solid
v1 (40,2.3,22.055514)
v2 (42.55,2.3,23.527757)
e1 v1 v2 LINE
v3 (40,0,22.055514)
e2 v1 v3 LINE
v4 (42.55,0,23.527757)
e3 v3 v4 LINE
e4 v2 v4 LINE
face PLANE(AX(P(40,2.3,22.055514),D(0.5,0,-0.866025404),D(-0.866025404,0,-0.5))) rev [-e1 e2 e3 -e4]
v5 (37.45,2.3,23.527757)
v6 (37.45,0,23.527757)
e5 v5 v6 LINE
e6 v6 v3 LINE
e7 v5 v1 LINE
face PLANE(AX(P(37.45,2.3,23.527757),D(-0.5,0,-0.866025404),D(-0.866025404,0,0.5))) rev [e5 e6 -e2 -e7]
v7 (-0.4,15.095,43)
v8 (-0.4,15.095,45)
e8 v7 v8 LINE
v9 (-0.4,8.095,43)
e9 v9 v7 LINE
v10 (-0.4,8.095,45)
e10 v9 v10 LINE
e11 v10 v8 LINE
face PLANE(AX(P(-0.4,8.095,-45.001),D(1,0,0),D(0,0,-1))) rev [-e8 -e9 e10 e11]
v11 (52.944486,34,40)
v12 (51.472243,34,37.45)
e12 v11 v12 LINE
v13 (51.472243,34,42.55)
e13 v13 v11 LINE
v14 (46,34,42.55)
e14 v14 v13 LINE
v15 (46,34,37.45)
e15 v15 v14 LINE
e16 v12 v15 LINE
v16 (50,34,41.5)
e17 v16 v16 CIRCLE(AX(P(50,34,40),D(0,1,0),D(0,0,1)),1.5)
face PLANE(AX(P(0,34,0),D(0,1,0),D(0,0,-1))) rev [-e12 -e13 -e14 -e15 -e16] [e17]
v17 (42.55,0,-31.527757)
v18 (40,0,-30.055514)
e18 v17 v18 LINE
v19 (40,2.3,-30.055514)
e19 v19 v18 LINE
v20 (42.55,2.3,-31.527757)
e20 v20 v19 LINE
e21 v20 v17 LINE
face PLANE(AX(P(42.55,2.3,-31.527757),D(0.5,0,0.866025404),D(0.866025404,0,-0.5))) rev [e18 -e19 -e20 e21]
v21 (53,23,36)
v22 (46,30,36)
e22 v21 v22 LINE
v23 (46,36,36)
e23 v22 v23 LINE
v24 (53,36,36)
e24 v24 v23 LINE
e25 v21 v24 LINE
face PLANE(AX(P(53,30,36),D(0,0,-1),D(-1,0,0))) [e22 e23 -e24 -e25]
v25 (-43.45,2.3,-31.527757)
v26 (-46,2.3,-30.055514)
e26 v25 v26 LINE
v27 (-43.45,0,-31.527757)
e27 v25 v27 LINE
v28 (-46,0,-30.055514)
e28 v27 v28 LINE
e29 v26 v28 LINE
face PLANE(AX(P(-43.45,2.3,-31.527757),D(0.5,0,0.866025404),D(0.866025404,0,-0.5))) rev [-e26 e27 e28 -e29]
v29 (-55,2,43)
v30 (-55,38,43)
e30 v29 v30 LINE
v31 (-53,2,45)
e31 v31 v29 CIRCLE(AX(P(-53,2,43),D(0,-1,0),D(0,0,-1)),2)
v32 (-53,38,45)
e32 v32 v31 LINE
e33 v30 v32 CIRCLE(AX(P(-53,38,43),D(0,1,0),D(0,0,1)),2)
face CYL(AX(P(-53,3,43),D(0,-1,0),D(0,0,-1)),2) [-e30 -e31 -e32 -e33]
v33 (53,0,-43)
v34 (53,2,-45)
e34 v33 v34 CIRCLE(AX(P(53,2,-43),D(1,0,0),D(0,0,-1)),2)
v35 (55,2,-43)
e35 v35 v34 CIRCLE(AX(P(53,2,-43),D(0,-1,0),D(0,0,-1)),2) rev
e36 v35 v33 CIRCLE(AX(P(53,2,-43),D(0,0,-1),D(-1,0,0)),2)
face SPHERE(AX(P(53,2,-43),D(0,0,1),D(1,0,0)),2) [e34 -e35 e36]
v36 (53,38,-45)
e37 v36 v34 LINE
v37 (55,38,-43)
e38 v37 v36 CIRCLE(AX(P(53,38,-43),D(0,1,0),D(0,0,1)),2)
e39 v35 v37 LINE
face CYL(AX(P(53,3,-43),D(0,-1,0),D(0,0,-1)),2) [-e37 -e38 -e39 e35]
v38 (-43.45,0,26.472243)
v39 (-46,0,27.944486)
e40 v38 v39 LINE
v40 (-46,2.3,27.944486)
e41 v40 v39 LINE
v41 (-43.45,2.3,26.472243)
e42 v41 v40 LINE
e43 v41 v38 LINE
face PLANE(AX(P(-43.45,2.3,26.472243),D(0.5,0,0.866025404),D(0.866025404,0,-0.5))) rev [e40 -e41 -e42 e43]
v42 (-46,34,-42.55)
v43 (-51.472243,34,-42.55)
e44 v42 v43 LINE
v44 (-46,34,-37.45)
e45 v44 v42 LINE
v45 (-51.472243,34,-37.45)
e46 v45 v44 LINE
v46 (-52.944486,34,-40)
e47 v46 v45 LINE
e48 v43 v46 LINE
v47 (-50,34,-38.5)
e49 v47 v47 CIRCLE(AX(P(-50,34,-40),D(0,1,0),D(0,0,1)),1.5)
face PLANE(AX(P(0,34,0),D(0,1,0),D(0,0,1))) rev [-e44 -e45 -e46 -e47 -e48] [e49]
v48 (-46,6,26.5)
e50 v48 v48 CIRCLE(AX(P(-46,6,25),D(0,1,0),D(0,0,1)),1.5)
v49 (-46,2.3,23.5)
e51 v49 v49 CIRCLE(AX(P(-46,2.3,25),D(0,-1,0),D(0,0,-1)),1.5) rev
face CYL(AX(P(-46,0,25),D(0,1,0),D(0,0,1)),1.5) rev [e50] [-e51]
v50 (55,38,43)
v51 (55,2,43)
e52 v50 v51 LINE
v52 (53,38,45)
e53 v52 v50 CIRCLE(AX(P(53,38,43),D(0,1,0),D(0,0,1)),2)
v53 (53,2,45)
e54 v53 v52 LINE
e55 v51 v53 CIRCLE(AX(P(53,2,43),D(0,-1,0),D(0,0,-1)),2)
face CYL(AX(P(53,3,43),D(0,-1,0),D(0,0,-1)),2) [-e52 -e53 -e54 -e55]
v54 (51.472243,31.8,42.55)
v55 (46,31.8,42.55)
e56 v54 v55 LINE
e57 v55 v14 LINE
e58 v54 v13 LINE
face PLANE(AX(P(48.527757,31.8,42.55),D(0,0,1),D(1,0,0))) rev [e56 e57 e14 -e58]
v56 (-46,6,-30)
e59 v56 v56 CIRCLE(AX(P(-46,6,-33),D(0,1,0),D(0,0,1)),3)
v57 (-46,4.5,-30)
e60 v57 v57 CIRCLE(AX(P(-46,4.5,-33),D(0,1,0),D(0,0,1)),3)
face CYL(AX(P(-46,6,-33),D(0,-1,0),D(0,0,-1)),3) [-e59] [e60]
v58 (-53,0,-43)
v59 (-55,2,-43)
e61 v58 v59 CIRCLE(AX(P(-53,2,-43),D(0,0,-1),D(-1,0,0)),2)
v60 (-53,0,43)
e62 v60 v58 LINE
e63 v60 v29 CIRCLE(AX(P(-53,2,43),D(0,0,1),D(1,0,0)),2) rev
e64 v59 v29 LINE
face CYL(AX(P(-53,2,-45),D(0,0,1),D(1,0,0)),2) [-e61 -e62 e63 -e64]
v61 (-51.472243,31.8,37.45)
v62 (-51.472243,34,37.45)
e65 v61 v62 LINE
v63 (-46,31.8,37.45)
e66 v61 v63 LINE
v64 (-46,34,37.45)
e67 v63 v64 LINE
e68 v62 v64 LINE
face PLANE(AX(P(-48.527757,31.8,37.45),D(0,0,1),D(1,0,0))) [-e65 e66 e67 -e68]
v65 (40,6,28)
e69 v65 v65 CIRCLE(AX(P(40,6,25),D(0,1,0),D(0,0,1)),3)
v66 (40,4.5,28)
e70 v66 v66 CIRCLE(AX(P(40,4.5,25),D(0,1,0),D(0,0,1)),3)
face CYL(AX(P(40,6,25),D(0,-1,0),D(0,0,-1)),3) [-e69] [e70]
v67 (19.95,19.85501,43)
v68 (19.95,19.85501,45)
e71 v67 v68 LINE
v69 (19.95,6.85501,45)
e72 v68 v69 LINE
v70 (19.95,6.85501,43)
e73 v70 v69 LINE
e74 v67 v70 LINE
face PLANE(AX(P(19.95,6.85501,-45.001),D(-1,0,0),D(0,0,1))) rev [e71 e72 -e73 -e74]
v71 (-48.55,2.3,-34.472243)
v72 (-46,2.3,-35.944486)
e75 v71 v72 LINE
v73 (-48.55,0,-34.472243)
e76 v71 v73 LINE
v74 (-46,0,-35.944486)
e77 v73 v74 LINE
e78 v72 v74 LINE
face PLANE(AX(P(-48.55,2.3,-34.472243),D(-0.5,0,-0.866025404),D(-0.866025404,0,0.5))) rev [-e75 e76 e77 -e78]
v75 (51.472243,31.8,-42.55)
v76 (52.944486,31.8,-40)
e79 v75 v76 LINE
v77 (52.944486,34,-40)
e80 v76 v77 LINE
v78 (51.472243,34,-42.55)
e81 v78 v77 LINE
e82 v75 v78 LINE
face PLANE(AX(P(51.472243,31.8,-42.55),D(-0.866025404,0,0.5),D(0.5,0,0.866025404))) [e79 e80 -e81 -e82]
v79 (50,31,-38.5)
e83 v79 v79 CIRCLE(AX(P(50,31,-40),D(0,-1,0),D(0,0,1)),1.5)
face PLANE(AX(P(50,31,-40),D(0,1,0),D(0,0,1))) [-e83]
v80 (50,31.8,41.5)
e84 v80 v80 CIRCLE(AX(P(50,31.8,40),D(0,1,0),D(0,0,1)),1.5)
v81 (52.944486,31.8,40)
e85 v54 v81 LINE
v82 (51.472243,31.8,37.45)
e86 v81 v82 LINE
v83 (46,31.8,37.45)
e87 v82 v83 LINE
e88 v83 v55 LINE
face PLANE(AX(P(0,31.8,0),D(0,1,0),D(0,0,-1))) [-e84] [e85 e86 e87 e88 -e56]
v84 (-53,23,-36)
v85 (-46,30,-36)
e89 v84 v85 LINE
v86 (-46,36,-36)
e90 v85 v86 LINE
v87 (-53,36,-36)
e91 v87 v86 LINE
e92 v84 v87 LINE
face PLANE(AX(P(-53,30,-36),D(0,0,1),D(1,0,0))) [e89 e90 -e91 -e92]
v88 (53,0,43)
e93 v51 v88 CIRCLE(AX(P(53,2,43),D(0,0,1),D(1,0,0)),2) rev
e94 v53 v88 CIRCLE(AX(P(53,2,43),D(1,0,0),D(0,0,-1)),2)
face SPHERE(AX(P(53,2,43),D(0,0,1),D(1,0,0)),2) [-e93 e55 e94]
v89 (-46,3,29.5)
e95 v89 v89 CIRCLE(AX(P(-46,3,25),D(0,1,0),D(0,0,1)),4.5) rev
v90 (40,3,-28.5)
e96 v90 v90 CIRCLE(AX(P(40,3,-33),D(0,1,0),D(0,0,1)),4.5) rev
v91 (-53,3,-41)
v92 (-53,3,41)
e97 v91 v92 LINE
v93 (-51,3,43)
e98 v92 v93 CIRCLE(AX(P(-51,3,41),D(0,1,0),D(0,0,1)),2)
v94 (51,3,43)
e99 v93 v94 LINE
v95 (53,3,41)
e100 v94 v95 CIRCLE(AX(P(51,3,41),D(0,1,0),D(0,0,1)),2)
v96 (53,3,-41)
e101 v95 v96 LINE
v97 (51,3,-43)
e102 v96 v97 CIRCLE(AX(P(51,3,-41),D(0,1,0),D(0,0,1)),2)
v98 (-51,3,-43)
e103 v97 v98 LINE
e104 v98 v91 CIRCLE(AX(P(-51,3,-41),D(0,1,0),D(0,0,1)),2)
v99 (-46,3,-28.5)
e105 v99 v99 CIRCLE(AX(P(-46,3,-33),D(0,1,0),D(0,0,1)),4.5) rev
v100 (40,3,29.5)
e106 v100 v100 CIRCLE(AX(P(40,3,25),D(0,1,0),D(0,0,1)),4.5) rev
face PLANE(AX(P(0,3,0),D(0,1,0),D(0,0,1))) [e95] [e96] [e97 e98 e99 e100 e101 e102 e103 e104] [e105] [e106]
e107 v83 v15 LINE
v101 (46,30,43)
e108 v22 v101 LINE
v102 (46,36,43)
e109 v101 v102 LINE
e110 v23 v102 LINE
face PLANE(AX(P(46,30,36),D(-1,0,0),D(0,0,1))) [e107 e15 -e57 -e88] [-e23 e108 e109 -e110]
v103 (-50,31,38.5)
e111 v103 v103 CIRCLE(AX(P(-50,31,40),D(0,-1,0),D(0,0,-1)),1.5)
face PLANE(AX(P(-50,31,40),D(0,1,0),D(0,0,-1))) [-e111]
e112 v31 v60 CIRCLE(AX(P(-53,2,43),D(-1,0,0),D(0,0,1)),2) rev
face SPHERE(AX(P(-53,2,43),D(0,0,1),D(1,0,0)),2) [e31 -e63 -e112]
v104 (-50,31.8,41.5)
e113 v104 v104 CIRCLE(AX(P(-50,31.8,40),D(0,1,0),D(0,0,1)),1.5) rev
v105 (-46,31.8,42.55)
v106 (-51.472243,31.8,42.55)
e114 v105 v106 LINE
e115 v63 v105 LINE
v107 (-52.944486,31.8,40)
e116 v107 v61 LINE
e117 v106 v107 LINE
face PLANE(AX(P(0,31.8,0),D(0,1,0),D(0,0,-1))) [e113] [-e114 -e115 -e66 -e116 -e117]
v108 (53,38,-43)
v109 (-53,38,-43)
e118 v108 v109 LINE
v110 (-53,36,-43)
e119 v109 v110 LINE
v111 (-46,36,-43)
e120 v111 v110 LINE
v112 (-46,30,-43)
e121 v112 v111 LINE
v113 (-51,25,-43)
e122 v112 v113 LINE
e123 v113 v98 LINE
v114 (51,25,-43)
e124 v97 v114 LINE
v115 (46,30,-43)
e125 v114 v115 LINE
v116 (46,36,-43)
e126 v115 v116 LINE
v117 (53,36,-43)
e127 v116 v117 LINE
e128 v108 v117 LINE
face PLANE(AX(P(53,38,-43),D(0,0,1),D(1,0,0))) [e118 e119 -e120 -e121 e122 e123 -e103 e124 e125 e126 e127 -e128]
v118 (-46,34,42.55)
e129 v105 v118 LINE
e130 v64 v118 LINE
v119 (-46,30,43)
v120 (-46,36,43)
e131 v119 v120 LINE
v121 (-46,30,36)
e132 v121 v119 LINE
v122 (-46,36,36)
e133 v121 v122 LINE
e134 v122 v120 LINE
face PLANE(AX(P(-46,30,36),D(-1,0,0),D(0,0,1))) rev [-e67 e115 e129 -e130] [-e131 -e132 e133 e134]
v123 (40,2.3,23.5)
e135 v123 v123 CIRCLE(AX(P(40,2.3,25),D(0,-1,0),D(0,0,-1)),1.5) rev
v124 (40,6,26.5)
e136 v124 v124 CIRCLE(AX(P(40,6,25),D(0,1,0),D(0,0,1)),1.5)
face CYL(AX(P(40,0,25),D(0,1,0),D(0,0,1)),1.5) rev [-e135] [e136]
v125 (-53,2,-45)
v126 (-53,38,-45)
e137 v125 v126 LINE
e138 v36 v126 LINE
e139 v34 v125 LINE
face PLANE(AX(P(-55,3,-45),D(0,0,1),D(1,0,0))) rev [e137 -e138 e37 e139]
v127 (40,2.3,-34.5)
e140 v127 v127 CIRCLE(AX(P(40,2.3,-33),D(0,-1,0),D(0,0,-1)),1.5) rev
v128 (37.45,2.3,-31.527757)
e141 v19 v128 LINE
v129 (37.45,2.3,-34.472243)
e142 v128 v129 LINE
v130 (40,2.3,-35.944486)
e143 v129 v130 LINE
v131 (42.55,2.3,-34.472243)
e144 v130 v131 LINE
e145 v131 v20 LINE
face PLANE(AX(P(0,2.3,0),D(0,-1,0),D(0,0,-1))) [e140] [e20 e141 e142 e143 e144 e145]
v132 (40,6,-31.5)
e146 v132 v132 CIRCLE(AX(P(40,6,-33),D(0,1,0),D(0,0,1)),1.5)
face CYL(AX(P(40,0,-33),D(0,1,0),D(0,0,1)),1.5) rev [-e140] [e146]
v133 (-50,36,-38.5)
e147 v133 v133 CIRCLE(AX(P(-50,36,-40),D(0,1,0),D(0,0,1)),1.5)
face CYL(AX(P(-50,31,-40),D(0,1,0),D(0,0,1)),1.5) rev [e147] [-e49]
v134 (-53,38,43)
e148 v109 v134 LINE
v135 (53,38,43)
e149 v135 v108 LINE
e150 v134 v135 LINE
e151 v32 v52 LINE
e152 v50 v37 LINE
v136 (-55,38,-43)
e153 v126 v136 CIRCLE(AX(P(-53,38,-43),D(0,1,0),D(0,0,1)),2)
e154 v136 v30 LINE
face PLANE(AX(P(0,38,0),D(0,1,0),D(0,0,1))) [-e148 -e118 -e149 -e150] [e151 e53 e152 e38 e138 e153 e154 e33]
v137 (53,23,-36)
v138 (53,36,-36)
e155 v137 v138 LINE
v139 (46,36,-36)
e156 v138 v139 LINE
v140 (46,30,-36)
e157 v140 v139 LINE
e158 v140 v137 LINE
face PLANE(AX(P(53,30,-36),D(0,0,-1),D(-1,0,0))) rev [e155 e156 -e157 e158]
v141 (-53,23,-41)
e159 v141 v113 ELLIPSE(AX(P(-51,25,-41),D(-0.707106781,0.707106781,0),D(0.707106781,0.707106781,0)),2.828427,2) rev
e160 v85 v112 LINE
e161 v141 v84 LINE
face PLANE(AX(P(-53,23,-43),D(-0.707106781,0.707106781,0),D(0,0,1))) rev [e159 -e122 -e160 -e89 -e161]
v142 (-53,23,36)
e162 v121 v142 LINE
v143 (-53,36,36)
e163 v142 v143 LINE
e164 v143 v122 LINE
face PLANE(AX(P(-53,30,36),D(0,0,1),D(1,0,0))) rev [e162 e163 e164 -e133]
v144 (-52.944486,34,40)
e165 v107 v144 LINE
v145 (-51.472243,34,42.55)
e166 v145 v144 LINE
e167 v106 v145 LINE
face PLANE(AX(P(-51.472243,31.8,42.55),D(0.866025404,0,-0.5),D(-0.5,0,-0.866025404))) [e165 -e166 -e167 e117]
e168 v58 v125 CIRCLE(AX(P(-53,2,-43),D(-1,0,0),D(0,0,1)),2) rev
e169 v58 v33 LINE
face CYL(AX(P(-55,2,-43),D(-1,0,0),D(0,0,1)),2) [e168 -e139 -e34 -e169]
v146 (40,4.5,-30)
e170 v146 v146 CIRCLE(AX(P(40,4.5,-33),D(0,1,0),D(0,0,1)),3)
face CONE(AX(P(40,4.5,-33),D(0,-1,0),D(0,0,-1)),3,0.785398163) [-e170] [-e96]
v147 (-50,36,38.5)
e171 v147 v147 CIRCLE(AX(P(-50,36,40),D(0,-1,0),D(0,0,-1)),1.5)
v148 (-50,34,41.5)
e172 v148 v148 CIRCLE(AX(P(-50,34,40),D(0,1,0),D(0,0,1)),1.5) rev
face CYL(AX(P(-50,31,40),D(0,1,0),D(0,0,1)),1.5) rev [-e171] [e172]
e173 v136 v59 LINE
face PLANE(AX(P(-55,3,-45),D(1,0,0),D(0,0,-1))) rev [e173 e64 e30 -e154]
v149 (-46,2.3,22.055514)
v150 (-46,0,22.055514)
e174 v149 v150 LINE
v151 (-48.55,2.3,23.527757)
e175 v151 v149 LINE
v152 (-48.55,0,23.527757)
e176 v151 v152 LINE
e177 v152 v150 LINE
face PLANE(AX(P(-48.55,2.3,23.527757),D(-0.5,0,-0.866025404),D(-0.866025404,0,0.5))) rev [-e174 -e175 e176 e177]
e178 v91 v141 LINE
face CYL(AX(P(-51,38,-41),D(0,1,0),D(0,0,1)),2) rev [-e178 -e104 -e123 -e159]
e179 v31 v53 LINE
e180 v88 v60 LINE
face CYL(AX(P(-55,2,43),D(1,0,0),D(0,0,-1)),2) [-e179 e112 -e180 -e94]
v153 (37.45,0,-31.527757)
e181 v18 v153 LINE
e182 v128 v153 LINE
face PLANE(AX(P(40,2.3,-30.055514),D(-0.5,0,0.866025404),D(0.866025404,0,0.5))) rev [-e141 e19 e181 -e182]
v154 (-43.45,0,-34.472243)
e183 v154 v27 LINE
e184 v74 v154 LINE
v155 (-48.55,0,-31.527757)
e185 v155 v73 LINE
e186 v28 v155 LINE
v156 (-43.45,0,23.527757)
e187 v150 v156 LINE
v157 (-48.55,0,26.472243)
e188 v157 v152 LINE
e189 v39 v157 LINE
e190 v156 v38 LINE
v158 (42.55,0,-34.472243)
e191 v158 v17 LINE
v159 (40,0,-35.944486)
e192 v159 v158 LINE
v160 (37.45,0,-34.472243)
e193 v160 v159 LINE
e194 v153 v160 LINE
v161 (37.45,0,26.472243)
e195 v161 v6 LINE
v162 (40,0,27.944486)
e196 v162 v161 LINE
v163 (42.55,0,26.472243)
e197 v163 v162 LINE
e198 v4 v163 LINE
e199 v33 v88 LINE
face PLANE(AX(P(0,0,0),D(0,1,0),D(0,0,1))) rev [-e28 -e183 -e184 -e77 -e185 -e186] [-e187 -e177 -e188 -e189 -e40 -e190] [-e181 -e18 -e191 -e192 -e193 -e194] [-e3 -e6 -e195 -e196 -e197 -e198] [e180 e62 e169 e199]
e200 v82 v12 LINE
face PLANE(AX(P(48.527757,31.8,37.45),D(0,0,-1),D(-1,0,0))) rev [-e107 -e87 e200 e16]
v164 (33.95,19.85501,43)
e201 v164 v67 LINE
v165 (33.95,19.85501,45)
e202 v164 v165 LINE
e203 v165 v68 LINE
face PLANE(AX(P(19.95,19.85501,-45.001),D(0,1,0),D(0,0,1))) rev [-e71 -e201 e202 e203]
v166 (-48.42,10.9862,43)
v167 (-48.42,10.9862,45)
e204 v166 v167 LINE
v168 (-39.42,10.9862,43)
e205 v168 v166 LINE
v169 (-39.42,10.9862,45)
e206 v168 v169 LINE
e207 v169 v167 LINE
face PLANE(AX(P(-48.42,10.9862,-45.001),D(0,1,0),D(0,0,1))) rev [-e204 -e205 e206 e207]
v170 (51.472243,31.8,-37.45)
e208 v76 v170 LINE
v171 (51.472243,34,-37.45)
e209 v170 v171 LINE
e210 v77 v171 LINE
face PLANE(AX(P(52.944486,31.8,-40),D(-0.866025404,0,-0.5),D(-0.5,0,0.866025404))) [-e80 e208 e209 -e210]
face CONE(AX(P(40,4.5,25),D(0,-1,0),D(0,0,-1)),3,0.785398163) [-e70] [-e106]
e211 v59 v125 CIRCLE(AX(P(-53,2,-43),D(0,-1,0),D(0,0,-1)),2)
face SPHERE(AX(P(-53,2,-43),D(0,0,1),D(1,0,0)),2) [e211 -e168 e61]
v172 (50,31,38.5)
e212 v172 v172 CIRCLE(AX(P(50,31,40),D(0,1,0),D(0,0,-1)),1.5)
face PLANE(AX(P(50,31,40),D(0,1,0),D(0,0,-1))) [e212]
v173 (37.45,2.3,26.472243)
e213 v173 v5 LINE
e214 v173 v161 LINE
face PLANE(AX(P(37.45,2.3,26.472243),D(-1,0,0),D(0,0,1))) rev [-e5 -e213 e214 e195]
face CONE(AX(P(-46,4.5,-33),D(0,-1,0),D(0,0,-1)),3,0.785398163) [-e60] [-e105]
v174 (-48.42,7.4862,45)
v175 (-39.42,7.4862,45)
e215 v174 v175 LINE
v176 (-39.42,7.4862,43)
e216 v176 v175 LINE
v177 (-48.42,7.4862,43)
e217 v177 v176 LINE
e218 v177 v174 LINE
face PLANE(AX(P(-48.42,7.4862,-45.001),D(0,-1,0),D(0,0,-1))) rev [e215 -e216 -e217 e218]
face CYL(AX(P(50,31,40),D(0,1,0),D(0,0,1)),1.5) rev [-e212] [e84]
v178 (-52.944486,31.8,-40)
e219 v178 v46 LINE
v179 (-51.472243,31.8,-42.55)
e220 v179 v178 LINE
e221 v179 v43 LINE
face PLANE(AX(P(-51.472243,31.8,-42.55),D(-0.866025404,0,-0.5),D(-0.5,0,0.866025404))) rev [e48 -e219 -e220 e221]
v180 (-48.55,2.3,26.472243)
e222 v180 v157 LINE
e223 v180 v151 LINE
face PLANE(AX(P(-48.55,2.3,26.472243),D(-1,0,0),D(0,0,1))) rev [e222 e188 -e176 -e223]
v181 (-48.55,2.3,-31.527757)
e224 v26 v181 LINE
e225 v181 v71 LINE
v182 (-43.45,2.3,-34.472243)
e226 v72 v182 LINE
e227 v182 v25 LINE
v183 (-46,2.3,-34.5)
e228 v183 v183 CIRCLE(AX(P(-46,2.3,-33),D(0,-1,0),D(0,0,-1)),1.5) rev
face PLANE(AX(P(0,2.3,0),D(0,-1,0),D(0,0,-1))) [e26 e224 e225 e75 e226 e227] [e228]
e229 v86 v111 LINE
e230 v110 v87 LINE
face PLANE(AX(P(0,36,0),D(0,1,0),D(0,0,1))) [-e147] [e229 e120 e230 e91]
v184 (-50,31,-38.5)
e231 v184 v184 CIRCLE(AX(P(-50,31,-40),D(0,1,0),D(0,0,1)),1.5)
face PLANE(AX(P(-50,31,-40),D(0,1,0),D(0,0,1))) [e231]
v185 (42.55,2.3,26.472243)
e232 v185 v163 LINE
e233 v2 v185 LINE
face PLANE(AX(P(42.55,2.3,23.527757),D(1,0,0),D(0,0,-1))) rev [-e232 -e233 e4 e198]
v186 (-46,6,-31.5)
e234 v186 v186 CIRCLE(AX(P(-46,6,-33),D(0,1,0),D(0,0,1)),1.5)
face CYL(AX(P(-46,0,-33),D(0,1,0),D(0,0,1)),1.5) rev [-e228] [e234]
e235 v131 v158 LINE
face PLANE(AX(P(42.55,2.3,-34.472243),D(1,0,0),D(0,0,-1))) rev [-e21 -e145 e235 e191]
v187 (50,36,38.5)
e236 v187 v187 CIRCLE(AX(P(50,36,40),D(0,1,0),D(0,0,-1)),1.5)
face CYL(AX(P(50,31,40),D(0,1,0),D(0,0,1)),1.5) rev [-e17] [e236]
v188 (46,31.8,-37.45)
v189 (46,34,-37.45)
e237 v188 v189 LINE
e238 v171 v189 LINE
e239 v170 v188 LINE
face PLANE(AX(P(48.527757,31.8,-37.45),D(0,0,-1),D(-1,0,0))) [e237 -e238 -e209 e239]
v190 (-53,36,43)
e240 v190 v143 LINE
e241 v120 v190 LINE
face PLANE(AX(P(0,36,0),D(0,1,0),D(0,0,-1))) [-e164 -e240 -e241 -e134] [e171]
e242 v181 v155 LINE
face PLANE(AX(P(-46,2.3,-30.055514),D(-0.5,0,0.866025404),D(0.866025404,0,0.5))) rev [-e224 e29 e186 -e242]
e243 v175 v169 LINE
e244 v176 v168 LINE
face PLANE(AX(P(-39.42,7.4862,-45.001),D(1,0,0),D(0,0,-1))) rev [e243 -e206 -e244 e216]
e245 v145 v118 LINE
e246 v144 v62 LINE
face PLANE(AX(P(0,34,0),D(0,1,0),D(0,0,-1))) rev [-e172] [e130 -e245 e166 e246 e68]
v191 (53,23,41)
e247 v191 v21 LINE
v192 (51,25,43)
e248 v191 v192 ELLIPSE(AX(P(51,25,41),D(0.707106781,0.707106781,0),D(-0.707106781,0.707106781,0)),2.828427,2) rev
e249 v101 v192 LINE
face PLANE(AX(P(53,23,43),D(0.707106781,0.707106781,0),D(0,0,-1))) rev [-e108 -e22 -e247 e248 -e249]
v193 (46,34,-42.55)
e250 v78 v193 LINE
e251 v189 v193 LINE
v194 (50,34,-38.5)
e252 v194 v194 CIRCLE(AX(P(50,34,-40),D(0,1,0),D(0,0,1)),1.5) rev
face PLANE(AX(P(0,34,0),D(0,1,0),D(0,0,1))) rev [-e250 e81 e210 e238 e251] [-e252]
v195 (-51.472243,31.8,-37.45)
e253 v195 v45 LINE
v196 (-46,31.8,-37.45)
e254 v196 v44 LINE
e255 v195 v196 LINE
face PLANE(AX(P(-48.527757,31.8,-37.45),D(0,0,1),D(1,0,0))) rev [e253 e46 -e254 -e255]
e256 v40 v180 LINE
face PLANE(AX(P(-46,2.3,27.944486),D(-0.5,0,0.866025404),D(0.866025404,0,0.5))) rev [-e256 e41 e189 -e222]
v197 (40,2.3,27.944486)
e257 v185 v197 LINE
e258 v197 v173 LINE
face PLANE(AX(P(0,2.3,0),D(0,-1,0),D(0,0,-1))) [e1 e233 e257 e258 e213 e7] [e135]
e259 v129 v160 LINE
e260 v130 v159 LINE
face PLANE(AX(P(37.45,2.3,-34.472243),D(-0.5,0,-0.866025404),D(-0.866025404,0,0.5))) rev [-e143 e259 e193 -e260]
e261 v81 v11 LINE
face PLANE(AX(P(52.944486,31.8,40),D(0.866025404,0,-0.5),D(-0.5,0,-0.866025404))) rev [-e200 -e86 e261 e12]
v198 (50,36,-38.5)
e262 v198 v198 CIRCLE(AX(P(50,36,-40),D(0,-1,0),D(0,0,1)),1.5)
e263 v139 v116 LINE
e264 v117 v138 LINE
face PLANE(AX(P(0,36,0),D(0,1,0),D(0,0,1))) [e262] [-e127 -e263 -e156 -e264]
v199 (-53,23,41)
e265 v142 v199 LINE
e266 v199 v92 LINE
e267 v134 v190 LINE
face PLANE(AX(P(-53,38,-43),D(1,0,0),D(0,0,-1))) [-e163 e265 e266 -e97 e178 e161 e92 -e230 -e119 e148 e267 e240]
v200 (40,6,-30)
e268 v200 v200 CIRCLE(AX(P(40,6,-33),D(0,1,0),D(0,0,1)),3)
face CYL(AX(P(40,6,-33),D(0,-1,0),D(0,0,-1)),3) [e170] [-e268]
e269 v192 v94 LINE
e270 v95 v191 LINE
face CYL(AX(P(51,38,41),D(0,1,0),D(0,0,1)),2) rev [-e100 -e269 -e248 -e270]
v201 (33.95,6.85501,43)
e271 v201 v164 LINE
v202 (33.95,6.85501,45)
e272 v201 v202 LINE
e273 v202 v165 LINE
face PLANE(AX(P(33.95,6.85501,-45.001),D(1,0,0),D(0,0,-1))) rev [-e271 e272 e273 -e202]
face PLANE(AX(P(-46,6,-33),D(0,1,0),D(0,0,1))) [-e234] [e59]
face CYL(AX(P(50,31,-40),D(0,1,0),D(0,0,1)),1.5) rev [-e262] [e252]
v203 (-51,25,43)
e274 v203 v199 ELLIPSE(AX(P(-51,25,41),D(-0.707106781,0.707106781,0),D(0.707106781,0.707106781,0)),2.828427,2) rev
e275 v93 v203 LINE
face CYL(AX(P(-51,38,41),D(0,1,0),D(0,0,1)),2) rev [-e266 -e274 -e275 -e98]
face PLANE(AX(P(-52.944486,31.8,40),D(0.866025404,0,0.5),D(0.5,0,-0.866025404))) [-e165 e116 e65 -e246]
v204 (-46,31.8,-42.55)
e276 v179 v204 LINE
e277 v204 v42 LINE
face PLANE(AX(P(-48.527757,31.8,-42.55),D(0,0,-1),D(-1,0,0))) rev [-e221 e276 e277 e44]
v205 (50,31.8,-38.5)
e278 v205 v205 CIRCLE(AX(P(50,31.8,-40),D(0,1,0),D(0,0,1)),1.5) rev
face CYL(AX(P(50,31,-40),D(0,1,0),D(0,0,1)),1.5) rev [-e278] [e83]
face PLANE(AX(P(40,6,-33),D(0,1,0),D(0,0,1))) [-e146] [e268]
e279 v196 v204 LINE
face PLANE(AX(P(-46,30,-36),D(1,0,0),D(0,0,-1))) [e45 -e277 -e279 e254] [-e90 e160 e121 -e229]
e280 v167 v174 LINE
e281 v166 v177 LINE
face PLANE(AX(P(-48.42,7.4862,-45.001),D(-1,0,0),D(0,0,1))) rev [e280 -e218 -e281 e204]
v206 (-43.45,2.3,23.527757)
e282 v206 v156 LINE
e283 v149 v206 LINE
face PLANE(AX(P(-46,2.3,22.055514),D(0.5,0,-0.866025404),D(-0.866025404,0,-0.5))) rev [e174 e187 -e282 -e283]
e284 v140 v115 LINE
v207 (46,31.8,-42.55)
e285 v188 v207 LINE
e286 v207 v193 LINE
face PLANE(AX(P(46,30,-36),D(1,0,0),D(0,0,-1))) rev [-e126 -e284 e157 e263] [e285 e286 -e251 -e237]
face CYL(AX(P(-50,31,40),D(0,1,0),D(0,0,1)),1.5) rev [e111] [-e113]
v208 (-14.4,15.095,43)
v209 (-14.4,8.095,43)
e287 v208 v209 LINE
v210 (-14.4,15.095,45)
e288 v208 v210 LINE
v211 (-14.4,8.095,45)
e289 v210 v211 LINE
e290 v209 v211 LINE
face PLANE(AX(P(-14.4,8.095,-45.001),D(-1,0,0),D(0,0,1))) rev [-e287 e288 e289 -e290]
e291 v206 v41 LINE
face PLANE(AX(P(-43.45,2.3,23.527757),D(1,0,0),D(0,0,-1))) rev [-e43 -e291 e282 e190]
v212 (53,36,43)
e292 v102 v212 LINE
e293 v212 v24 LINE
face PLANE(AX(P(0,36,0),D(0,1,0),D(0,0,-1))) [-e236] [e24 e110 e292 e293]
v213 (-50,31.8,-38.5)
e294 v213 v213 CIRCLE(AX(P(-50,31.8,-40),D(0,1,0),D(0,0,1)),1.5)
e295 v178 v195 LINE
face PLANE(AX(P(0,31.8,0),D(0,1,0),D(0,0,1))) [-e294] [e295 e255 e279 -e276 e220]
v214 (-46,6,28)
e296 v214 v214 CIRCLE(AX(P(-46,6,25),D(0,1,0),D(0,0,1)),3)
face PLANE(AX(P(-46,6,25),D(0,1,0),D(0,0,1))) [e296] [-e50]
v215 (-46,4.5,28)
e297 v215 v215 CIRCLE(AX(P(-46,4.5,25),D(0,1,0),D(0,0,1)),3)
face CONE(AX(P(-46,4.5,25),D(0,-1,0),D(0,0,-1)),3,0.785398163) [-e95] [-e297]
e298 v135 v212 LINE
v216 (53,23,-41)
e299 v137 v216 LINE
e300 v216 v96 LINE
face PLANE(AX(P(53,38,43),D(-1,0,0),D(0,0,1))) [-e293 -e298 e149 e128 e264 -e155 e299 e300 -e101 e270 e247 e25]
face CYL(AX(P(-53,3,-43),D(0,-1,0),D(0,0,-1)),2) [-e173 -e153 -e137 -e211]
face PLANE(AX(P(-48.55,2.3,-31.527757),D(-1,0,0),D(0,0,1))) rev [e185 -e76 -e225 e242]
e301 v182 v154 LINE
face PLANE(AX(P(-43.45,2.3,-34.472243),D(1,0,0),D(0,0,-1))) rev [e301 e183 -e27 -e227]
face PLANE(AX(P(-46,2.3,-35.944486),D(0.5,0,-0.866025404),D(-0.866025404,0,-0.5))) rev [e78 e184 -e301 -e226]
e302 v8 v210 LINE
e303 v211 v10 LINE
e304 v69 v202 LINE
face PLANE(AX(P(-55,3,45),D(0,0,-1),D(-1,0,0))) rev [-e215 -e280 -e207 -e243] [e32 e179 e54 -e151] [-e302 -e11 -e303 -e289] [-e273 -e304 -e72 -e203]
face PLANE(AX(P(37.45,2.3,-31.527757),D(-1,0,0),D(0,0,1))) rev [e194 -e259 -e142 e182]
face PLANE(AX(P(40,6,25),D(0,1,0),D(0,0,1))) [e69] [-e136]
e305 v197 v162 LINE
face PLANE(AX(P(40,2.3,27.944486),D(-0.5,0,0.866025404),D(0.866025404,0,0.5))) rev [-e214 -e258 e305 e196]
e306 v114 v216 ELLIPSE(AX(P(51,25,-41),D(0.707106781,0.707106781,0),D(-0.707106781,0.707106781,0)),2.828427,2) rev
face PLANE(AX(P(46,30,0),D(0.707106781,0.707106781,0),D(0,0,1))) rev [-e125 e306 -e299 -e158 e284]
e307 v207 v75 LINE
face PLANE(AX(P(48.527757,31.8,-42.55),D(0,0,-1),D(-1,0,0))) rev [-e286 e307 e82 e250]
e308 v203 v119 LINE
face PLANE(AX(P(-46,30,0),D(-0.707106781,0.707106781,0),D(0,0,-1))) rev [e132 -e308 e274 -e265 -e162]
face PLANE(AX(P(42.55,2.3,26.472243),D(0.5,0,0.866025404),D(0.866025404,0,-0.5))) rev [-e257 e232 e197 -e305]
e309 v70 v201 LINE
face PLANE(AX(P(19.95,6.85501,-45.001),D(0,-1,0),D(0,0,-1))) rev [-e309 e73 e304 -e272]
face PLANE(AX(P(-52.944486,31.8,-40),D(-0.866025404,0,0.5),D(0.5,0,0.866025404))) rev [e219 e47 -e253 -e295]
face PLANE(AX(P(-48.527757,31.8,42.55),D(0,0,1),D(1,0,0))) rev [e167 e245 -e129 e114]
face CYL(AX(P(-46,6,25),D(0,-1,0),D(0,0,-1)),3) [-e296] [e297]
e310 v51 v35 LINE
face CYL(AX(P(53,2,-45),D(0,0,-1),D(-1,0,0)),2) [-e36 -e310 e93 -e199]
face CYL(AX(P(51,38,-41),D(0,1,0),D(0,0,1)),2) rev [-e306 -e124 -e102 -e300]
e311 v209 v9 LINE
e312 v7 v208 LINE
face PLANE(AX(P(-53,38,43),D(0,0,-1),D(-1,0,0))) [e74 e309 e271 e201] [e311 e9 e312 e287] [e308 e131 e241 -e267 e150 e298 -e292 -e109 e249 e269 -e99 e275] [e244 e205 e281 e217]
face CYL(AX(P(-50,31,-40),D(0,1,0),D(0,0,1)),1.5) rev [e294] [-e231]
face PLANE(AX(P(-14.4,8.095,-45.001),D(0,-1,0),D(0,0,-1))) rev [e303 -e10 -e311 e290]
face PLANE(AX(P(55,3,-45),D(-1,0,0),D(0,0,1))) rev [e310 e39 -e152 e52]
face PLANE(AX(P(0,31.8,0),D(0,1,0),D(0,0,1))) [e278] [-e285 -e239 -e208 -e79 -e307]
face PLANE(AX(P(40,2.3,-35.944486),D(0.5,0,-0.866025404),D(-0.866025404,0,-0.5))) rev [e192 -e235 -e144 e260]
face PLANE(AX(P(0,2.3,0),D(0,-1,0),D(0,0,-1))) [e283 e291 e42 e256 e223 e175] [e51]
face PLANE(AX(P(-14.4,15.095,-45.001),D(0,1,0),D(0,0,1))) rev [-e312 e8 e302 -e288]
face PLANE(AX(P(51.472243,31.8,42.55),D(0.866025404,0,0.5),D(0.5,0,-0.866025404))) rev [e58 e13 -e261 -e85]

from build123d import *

# Parameters (mm, degrees)
SKETCH1_W               = 110
SKETCH1_H               = 90
BOSS_EXTRUDE1_DEPTH     = 3
SKETCH2_W               = 110
SKETCH2_H               = 90
SKETCH2_W_2             = 106
SKETCH2_H_2             = 86
BOSS_EXTRUDE2_DEPTH     = 35
SKETCH3_R               = 3
BOSS_EXTRUDE3_DEPTH     = 3
SKETCH4_R               = 1.5
CUT_EXTRUDE1_DEPTH      = 78.935871074
CUT_EXTRUDE2_DEPTH      = 2.3
CUT_EXTRUDE3_REACH      = 114.112
SKETCH6_W               = 9
SKETCH6_H               = 3.5
SKETCH6_W_2             = 14
SKETCH6_H_2             = 13
SKETCH6_H_3             = 7
FILLET2_R               = 2
SKETCH7_W               = 7
SKETCH7_H               = 7
BOSS_EXTRUDE4_DEPTH     = 6
CUT_EXTRUDE4_DEPTH      = 2.2
SKETCH10_R              = 1.5
CUT_EXTRUDE5_DEPTH      = 5
CHAMFER2_SIZE           = 7
MIRROR4_COPY_1_SKETCH_W = 7
MIRROR4_COPY_1_SKETCH_H = 7
MIRROR4_COPY_1_DEPTH    = 6
MIRROR4_COPY_2_DEPTH    = 2.2
MIRROR4_COPY_3_SKETCH_R = 1.5
MIRROR4_COPY_3_DEPTH    = 5
CHAMFER3_SIZE           = 7
CHAMFER4_SIZE           = 7
FILLET6_R               = 2
CHAMFER5_SIZE           = 1.5


with BuildPart() as part:
    # Sketch1 → Boss-Extrude1 (new body)
    with BuildSketch(Plane(origin=(0, 0, 0), x_dir=(1, 0, 0), z_dir=(0, 1, 0))):
        Rectangle(SKETCH1_W, SKETCH1_H)
    extrude(amount=BOSS_EXTRUDE1_DEPTH)

    # Sketch2 → Boss-Extrude2 (add)
    with BuildSketch(Plane(origin=(0, 3, 0), x_dir=(1, 0, 0), z_dir=(0, 1, 0))):
        Rectangle(SKETCH2_W, SKETCH2_H)
        Rectangle(SKETCH2_W_2, SKETCH2_H_2, mode=Mode.SUBTRACT)
    extrude(amount=BOSS_EXTRUDE2_DEPTH)

    # Sketch3 → Boss-Extrude3 (add)
    with BuildSketch(Plane(origin=(0, 3, 0), x_dir=(1, 0, 0), z_dir=(0, 1, 0))):
        with Locations(Location((-46, 33, 0), (0, 0, 270))):
            Circle(SKETCH3_R)
        with Locations(Location((40, 33, 0), (0, 0, 270))):
            Circle(SKETCH3_R)
        with Locations(Location((-46, -25, 0), (0, 0, 270))):
            Circle(SKETCH3_R)
        with Locations(Location((40, -25, 0), (0, 0, 270))):
            Circle(SKETCH3_R)
    extrude(amount=BOSS_EXTRUDE3_DEPTH)

    # Sketch4 → Cut-Extrude1 (cut, through all)
    with BuildSketch(Plane(origin=(0, 6, 0), x_dir=(1, 0, 0), z_dir=(0, 1, 0))):
        with Locations(Location((-46, 33, 0), (0, 0, 270))):
            Circle(SKETCH4_R)
        with Locations(Location((40, 33, 0), (0, 0, 270))):
            Circle(SKETCH4_R)
        with Locations(Location((40, -25, 0), (0, 0, 270))):
            Circle(SKETCH4_R)
        with Locations(Location((-46, -25, 0), (0, 0, 270))):
            Circle(SKETCH4_R)
    extrude(amount=-CUT_EXTRUDE1_DEPTH, mode=Mode.SUBTRACT)

    # Sketch5 → Cut-Extrude2 (cut)
    with BuildSketch(Plane.XZ):
        Polygon((37.45, 26.472243186), (37.45, 23.527756814), (40, 22.055513627), (42.55, 23.527756814), (42.55, 26.472243186), (40, 27.944486373), align=None)
        Polygon((-46, 27.944486373), (-48.55, 26.472243186), (-48.55, 23.527756814), (-46, 22.055513627), (-43.45, 23.527756814), (-43.45, 26.472243186), align=None)
        Polygon((-48.55, -34.472243186), (-46, -35.944486373), (-43.45, -34.472243186), (-43.45, -31.527756814), (-46, -30.055513627), (-48.55, -31.527756814), align=None)
        Polygon((42.55, -34.472243186), (42.55, -31.527756814), (40, -30.055513627), (37.45, -31.527756814), (37.45, -34.472243186), (40, -35.944486373), align=None)
    extrude(amount=-CUT_EXTRUDE2_DEPTH, mode=Mode.SUBTRACT)

    # Sketch6 → Cut-Extrude3 (cut, up to next)
    with BuildSketch(Plane.XY.offset(45), mode=Mode.PRIVATE) as cut_extrude3_sk1:
        with Locations((-43.919999919, 9.236200323)):
            Rectangle(SKETCH6_W, SKETCH6_H)
    cut_extrude3_tool1 = extrude(cut_extrude3_sk1.sketch, amount=-CUT_EXTRUDE3_REACH, mode=Mode.PRIVATE) & part.part
    # Sketch6 → Cut-Extrude3 (cut, up to next)
    with BuildSketch(Plane.XY.offset(45), mode=Mode.PRIVATE) as cut_extrude3_sk2:
        with Locations((26.950000009, 13.355009857)):
            Rectangle(SKETCH6_W_2, SKETCH6_H_2)
    cut_extrude3_tool2 = extrude(cut_extrude3_sk2.sketch, amount=-CUT_EXTRUDE3_REACH, mode=Mode.PRIVATE) & part.part
    # Sketch6 → Cut-Extrude3 (cut, up to next)
    with BuildSketch(Plane.XY.offset(45), mode=Mode.PRIVATE) as cut_extrude3_sk3:
        with Locations((-7.4, 11.595)):
            Rectangle(SKETCH6_W_2, SKETCH6_H_3)
    cut_extrude3_tool3 = extrude(cut_extrude3_sk3.sketch, amount=-CUT_EXTRUDE3_REACH, mode=Mode.PRIVATE) & part.part
    add(cut_extrude3_tool1.solids().sort_by_distance((-43.92, 9.2362, 45))[0], mode=Mode.SUBTRACT)
    add(cut_extrude3_tool2.solids().sort_by_distance((26.95, 13.35501, 45))[0], mode=Mode.SUBTRACT)
    add(cut_extrude3_tool3.solids().sort_by_distance((-7.4, 11.595, 45))[0], mode=Mode.SUBTRACT)

    # Fillet2
    fillet2_edges = [part.edges().sort_by_distance(p)[0] for p in [
        (0, 0, 45),
        (-55, 0, 0),
        (0, 0, -45),
        (55, 0, 0),
        (55, 19, 45),
        (-55, 19, 45),
        (-55, 19, -45),
        (55, 19, -45),
    ]]
    fillet(fillet2_edges, radius=FILLET2_R)

    # Sketch7 → Boss-Extrude4 (add)
    with BuildSketch(Plane(origin=(0, 36, 0), x_dir=(1, 0, 0), z_dir=(0, 1, 0))):
        with Locations((-49.5, 39.5)):
            Rectangle(SKETCH7_W, SKETCH7_H)
    boss_extrude4 = extrude(amount=-BOSS_EXTRUDE4_DEPTH)

    # Sketch8 → Cut-Extrude4 (cut)
    with BuildSketch(Plane(origin=(0, 34, 0), x_dir=(1, 0, 0), z_dir=(0, 1, 0))):
        Polygon((-48.527756814, 42.55), (-51.472243186, 42.55), (-52.944486373, 40), (-51.472243186, 37.45), (-48.527756814, 37.45), (-46, 37.45), (-46, 42.55), align=None)
    cut_extrude4 = extrude(amount=-CUT_EXTRUDE4_DEPTH, mode=Mode.SUBTRACT)

    # Sketch10 → Cut-Extrude5 (cut)
    with BuildSketch(Plane(origin=(0, 36, 0), x_dir=(1, 0, 0), z_dir=(0, 1, 0))):
        with Locations(Location((-50, 40, 0), (0, 0, 270))):
            Circle(SKETCH10_R)
    cut_extrude5 = extrude(amount=-CUT_EXTRUDE5_DEPTH, mode=Mode.SUBTRACT)

    # Chamfer2
    chamfer2_edges = [part.edges().sort_by_distance(p)[0] for p in [
        (-53, 30, -39.5),
    ]]
    chamfer(chamfer2_edges, length=CHAMFER2_SIZE - 0.0001)  # a hair under: the kernel refuses the full size

    # Mirror3: Boss-Extrude4, Cut-Extrude4, Cut-Extrude5 across plane
    add(boss_extrude4.mirror(Plane(origin=(0, 0, 0), x_dir=(0, 0, 1), z_dir=(1, 0, 0))))
    add(cut_extrude4.mirror(Plane(origin=(0, 0, 0), x_dir=(0, 0, 1), z_dir=(1, 0, 0))), mode=Mode.SUBTRACT)
    add(cut_extrude5.mirror(Plane(origin=(0, 0, 0), x_dir=(0, 0, 1), z_dir=(1, 0, 0))), mode=Mode.SUBTRACT)

    # Mirror4: Boss-Extrude4, Cut-Extrude4, Cut-Extrude5 across plane
    add(boss_extrude4.mirror(Plane.XY))
    add(cut_extrude4.mirror(Plane.XY), mode=Mode.SUBTRACT)
    add(cut_extrude5.mirror(Plane.XY), mode=Mode.SUBTRACT)

    # Mirror4 copy 1 sketch → Mirror4 copy 1 (add)
    with BuildSketch(Plane(origin=(0, 36, 0), x_dir=(-1, 0, 0), z_dir=(0, 1, 0))):
        with Locations((-49.5, 39.5)):
            Rectangle(MIRROR4_COPY_1_SKETCH_W, MIRROR4_COPY_1_SKETCH_H)
    extrude(amount=-MIRROR4_COPY_1_DEPTH)

    # Mirror4 copy 2 sketch → Mirror4 copy 2 (cut)
    with BuildSketch(Plane(origin=(0, 34, 0), x_dir=(-1, 0, 0), z_dir=(0, 1, 0))):
        Polygon((-48.527756814, 42.55), (-51.472243186, 42.55), (-52.944486373, 40), (-51.472243186, 37.45), (-48.527756814, 37.45), (-46, 37.45), (-46, 42.55), align=None)
    extrude(amount=-MIRROR4_COPY_2_DEPTH, mode=Mode.SUBTRACT)

    # Mirror4 copy 3 sketch → Mirror4 copy 3 (cut)
    with BuildSketch(Plane(origin=(0, 36, 0), x_dir=(-1, 0, 0), z_dir=(0, 1, 0))):
        with Locations(Location((-50, 40, 0), (0, 0, 270))):
            Circle(MIRROR4_COPY_3_SKETCH_R)
    extrude(amount=-MIRROR4_COPY_3_DEPTH, mode=Mode.SUBTRACT)

    # Chamfer3
    chamfer3_edges = [part.edges().sort_by_distance(p)[0] for p in [
        (53, 30, -39.5),
    ]]
    chamfer(chamfer3_edges, length=CHAMFER3_SIZE - 0.0001)  # a hair under: the kernel refuses the full size

    # Chamfer4
    chamfer4_edges = [part.edges().sort_by_distance(p)[0] for p in [
        (-53, 30, 39.5),
        (53, 30, 39.5),
    ]]
    chamfer(chamfer4_edges, length=CHAMFER4_SIZE - 0.0001)  # a hair under: the kernel refuses the full size

    # Fillet6
    fillet6_edges = [part.edges().sort_by_distance(p)[0] for p in [
        (-53, 13.00005, -43),
        (53, 13.00005, -43),
        (-53, 13.00005, 43),
        (53, 13.00005, 43),
    ]]
    fillet(fillet6_edges, radius=FILLET6_R)

    # Chamfer5
    chamfer5_edges = [part.edges().sort_by_distance(p)[0] for p in [
        (-46, 3, -36),
        (40, 3, -36),
        (40, 3, 22),
        (-46, 3, 22),
    ]]
    chamfer(chamfer5_edges, length=CHAMFER5_SIZE)


solid = part.part
